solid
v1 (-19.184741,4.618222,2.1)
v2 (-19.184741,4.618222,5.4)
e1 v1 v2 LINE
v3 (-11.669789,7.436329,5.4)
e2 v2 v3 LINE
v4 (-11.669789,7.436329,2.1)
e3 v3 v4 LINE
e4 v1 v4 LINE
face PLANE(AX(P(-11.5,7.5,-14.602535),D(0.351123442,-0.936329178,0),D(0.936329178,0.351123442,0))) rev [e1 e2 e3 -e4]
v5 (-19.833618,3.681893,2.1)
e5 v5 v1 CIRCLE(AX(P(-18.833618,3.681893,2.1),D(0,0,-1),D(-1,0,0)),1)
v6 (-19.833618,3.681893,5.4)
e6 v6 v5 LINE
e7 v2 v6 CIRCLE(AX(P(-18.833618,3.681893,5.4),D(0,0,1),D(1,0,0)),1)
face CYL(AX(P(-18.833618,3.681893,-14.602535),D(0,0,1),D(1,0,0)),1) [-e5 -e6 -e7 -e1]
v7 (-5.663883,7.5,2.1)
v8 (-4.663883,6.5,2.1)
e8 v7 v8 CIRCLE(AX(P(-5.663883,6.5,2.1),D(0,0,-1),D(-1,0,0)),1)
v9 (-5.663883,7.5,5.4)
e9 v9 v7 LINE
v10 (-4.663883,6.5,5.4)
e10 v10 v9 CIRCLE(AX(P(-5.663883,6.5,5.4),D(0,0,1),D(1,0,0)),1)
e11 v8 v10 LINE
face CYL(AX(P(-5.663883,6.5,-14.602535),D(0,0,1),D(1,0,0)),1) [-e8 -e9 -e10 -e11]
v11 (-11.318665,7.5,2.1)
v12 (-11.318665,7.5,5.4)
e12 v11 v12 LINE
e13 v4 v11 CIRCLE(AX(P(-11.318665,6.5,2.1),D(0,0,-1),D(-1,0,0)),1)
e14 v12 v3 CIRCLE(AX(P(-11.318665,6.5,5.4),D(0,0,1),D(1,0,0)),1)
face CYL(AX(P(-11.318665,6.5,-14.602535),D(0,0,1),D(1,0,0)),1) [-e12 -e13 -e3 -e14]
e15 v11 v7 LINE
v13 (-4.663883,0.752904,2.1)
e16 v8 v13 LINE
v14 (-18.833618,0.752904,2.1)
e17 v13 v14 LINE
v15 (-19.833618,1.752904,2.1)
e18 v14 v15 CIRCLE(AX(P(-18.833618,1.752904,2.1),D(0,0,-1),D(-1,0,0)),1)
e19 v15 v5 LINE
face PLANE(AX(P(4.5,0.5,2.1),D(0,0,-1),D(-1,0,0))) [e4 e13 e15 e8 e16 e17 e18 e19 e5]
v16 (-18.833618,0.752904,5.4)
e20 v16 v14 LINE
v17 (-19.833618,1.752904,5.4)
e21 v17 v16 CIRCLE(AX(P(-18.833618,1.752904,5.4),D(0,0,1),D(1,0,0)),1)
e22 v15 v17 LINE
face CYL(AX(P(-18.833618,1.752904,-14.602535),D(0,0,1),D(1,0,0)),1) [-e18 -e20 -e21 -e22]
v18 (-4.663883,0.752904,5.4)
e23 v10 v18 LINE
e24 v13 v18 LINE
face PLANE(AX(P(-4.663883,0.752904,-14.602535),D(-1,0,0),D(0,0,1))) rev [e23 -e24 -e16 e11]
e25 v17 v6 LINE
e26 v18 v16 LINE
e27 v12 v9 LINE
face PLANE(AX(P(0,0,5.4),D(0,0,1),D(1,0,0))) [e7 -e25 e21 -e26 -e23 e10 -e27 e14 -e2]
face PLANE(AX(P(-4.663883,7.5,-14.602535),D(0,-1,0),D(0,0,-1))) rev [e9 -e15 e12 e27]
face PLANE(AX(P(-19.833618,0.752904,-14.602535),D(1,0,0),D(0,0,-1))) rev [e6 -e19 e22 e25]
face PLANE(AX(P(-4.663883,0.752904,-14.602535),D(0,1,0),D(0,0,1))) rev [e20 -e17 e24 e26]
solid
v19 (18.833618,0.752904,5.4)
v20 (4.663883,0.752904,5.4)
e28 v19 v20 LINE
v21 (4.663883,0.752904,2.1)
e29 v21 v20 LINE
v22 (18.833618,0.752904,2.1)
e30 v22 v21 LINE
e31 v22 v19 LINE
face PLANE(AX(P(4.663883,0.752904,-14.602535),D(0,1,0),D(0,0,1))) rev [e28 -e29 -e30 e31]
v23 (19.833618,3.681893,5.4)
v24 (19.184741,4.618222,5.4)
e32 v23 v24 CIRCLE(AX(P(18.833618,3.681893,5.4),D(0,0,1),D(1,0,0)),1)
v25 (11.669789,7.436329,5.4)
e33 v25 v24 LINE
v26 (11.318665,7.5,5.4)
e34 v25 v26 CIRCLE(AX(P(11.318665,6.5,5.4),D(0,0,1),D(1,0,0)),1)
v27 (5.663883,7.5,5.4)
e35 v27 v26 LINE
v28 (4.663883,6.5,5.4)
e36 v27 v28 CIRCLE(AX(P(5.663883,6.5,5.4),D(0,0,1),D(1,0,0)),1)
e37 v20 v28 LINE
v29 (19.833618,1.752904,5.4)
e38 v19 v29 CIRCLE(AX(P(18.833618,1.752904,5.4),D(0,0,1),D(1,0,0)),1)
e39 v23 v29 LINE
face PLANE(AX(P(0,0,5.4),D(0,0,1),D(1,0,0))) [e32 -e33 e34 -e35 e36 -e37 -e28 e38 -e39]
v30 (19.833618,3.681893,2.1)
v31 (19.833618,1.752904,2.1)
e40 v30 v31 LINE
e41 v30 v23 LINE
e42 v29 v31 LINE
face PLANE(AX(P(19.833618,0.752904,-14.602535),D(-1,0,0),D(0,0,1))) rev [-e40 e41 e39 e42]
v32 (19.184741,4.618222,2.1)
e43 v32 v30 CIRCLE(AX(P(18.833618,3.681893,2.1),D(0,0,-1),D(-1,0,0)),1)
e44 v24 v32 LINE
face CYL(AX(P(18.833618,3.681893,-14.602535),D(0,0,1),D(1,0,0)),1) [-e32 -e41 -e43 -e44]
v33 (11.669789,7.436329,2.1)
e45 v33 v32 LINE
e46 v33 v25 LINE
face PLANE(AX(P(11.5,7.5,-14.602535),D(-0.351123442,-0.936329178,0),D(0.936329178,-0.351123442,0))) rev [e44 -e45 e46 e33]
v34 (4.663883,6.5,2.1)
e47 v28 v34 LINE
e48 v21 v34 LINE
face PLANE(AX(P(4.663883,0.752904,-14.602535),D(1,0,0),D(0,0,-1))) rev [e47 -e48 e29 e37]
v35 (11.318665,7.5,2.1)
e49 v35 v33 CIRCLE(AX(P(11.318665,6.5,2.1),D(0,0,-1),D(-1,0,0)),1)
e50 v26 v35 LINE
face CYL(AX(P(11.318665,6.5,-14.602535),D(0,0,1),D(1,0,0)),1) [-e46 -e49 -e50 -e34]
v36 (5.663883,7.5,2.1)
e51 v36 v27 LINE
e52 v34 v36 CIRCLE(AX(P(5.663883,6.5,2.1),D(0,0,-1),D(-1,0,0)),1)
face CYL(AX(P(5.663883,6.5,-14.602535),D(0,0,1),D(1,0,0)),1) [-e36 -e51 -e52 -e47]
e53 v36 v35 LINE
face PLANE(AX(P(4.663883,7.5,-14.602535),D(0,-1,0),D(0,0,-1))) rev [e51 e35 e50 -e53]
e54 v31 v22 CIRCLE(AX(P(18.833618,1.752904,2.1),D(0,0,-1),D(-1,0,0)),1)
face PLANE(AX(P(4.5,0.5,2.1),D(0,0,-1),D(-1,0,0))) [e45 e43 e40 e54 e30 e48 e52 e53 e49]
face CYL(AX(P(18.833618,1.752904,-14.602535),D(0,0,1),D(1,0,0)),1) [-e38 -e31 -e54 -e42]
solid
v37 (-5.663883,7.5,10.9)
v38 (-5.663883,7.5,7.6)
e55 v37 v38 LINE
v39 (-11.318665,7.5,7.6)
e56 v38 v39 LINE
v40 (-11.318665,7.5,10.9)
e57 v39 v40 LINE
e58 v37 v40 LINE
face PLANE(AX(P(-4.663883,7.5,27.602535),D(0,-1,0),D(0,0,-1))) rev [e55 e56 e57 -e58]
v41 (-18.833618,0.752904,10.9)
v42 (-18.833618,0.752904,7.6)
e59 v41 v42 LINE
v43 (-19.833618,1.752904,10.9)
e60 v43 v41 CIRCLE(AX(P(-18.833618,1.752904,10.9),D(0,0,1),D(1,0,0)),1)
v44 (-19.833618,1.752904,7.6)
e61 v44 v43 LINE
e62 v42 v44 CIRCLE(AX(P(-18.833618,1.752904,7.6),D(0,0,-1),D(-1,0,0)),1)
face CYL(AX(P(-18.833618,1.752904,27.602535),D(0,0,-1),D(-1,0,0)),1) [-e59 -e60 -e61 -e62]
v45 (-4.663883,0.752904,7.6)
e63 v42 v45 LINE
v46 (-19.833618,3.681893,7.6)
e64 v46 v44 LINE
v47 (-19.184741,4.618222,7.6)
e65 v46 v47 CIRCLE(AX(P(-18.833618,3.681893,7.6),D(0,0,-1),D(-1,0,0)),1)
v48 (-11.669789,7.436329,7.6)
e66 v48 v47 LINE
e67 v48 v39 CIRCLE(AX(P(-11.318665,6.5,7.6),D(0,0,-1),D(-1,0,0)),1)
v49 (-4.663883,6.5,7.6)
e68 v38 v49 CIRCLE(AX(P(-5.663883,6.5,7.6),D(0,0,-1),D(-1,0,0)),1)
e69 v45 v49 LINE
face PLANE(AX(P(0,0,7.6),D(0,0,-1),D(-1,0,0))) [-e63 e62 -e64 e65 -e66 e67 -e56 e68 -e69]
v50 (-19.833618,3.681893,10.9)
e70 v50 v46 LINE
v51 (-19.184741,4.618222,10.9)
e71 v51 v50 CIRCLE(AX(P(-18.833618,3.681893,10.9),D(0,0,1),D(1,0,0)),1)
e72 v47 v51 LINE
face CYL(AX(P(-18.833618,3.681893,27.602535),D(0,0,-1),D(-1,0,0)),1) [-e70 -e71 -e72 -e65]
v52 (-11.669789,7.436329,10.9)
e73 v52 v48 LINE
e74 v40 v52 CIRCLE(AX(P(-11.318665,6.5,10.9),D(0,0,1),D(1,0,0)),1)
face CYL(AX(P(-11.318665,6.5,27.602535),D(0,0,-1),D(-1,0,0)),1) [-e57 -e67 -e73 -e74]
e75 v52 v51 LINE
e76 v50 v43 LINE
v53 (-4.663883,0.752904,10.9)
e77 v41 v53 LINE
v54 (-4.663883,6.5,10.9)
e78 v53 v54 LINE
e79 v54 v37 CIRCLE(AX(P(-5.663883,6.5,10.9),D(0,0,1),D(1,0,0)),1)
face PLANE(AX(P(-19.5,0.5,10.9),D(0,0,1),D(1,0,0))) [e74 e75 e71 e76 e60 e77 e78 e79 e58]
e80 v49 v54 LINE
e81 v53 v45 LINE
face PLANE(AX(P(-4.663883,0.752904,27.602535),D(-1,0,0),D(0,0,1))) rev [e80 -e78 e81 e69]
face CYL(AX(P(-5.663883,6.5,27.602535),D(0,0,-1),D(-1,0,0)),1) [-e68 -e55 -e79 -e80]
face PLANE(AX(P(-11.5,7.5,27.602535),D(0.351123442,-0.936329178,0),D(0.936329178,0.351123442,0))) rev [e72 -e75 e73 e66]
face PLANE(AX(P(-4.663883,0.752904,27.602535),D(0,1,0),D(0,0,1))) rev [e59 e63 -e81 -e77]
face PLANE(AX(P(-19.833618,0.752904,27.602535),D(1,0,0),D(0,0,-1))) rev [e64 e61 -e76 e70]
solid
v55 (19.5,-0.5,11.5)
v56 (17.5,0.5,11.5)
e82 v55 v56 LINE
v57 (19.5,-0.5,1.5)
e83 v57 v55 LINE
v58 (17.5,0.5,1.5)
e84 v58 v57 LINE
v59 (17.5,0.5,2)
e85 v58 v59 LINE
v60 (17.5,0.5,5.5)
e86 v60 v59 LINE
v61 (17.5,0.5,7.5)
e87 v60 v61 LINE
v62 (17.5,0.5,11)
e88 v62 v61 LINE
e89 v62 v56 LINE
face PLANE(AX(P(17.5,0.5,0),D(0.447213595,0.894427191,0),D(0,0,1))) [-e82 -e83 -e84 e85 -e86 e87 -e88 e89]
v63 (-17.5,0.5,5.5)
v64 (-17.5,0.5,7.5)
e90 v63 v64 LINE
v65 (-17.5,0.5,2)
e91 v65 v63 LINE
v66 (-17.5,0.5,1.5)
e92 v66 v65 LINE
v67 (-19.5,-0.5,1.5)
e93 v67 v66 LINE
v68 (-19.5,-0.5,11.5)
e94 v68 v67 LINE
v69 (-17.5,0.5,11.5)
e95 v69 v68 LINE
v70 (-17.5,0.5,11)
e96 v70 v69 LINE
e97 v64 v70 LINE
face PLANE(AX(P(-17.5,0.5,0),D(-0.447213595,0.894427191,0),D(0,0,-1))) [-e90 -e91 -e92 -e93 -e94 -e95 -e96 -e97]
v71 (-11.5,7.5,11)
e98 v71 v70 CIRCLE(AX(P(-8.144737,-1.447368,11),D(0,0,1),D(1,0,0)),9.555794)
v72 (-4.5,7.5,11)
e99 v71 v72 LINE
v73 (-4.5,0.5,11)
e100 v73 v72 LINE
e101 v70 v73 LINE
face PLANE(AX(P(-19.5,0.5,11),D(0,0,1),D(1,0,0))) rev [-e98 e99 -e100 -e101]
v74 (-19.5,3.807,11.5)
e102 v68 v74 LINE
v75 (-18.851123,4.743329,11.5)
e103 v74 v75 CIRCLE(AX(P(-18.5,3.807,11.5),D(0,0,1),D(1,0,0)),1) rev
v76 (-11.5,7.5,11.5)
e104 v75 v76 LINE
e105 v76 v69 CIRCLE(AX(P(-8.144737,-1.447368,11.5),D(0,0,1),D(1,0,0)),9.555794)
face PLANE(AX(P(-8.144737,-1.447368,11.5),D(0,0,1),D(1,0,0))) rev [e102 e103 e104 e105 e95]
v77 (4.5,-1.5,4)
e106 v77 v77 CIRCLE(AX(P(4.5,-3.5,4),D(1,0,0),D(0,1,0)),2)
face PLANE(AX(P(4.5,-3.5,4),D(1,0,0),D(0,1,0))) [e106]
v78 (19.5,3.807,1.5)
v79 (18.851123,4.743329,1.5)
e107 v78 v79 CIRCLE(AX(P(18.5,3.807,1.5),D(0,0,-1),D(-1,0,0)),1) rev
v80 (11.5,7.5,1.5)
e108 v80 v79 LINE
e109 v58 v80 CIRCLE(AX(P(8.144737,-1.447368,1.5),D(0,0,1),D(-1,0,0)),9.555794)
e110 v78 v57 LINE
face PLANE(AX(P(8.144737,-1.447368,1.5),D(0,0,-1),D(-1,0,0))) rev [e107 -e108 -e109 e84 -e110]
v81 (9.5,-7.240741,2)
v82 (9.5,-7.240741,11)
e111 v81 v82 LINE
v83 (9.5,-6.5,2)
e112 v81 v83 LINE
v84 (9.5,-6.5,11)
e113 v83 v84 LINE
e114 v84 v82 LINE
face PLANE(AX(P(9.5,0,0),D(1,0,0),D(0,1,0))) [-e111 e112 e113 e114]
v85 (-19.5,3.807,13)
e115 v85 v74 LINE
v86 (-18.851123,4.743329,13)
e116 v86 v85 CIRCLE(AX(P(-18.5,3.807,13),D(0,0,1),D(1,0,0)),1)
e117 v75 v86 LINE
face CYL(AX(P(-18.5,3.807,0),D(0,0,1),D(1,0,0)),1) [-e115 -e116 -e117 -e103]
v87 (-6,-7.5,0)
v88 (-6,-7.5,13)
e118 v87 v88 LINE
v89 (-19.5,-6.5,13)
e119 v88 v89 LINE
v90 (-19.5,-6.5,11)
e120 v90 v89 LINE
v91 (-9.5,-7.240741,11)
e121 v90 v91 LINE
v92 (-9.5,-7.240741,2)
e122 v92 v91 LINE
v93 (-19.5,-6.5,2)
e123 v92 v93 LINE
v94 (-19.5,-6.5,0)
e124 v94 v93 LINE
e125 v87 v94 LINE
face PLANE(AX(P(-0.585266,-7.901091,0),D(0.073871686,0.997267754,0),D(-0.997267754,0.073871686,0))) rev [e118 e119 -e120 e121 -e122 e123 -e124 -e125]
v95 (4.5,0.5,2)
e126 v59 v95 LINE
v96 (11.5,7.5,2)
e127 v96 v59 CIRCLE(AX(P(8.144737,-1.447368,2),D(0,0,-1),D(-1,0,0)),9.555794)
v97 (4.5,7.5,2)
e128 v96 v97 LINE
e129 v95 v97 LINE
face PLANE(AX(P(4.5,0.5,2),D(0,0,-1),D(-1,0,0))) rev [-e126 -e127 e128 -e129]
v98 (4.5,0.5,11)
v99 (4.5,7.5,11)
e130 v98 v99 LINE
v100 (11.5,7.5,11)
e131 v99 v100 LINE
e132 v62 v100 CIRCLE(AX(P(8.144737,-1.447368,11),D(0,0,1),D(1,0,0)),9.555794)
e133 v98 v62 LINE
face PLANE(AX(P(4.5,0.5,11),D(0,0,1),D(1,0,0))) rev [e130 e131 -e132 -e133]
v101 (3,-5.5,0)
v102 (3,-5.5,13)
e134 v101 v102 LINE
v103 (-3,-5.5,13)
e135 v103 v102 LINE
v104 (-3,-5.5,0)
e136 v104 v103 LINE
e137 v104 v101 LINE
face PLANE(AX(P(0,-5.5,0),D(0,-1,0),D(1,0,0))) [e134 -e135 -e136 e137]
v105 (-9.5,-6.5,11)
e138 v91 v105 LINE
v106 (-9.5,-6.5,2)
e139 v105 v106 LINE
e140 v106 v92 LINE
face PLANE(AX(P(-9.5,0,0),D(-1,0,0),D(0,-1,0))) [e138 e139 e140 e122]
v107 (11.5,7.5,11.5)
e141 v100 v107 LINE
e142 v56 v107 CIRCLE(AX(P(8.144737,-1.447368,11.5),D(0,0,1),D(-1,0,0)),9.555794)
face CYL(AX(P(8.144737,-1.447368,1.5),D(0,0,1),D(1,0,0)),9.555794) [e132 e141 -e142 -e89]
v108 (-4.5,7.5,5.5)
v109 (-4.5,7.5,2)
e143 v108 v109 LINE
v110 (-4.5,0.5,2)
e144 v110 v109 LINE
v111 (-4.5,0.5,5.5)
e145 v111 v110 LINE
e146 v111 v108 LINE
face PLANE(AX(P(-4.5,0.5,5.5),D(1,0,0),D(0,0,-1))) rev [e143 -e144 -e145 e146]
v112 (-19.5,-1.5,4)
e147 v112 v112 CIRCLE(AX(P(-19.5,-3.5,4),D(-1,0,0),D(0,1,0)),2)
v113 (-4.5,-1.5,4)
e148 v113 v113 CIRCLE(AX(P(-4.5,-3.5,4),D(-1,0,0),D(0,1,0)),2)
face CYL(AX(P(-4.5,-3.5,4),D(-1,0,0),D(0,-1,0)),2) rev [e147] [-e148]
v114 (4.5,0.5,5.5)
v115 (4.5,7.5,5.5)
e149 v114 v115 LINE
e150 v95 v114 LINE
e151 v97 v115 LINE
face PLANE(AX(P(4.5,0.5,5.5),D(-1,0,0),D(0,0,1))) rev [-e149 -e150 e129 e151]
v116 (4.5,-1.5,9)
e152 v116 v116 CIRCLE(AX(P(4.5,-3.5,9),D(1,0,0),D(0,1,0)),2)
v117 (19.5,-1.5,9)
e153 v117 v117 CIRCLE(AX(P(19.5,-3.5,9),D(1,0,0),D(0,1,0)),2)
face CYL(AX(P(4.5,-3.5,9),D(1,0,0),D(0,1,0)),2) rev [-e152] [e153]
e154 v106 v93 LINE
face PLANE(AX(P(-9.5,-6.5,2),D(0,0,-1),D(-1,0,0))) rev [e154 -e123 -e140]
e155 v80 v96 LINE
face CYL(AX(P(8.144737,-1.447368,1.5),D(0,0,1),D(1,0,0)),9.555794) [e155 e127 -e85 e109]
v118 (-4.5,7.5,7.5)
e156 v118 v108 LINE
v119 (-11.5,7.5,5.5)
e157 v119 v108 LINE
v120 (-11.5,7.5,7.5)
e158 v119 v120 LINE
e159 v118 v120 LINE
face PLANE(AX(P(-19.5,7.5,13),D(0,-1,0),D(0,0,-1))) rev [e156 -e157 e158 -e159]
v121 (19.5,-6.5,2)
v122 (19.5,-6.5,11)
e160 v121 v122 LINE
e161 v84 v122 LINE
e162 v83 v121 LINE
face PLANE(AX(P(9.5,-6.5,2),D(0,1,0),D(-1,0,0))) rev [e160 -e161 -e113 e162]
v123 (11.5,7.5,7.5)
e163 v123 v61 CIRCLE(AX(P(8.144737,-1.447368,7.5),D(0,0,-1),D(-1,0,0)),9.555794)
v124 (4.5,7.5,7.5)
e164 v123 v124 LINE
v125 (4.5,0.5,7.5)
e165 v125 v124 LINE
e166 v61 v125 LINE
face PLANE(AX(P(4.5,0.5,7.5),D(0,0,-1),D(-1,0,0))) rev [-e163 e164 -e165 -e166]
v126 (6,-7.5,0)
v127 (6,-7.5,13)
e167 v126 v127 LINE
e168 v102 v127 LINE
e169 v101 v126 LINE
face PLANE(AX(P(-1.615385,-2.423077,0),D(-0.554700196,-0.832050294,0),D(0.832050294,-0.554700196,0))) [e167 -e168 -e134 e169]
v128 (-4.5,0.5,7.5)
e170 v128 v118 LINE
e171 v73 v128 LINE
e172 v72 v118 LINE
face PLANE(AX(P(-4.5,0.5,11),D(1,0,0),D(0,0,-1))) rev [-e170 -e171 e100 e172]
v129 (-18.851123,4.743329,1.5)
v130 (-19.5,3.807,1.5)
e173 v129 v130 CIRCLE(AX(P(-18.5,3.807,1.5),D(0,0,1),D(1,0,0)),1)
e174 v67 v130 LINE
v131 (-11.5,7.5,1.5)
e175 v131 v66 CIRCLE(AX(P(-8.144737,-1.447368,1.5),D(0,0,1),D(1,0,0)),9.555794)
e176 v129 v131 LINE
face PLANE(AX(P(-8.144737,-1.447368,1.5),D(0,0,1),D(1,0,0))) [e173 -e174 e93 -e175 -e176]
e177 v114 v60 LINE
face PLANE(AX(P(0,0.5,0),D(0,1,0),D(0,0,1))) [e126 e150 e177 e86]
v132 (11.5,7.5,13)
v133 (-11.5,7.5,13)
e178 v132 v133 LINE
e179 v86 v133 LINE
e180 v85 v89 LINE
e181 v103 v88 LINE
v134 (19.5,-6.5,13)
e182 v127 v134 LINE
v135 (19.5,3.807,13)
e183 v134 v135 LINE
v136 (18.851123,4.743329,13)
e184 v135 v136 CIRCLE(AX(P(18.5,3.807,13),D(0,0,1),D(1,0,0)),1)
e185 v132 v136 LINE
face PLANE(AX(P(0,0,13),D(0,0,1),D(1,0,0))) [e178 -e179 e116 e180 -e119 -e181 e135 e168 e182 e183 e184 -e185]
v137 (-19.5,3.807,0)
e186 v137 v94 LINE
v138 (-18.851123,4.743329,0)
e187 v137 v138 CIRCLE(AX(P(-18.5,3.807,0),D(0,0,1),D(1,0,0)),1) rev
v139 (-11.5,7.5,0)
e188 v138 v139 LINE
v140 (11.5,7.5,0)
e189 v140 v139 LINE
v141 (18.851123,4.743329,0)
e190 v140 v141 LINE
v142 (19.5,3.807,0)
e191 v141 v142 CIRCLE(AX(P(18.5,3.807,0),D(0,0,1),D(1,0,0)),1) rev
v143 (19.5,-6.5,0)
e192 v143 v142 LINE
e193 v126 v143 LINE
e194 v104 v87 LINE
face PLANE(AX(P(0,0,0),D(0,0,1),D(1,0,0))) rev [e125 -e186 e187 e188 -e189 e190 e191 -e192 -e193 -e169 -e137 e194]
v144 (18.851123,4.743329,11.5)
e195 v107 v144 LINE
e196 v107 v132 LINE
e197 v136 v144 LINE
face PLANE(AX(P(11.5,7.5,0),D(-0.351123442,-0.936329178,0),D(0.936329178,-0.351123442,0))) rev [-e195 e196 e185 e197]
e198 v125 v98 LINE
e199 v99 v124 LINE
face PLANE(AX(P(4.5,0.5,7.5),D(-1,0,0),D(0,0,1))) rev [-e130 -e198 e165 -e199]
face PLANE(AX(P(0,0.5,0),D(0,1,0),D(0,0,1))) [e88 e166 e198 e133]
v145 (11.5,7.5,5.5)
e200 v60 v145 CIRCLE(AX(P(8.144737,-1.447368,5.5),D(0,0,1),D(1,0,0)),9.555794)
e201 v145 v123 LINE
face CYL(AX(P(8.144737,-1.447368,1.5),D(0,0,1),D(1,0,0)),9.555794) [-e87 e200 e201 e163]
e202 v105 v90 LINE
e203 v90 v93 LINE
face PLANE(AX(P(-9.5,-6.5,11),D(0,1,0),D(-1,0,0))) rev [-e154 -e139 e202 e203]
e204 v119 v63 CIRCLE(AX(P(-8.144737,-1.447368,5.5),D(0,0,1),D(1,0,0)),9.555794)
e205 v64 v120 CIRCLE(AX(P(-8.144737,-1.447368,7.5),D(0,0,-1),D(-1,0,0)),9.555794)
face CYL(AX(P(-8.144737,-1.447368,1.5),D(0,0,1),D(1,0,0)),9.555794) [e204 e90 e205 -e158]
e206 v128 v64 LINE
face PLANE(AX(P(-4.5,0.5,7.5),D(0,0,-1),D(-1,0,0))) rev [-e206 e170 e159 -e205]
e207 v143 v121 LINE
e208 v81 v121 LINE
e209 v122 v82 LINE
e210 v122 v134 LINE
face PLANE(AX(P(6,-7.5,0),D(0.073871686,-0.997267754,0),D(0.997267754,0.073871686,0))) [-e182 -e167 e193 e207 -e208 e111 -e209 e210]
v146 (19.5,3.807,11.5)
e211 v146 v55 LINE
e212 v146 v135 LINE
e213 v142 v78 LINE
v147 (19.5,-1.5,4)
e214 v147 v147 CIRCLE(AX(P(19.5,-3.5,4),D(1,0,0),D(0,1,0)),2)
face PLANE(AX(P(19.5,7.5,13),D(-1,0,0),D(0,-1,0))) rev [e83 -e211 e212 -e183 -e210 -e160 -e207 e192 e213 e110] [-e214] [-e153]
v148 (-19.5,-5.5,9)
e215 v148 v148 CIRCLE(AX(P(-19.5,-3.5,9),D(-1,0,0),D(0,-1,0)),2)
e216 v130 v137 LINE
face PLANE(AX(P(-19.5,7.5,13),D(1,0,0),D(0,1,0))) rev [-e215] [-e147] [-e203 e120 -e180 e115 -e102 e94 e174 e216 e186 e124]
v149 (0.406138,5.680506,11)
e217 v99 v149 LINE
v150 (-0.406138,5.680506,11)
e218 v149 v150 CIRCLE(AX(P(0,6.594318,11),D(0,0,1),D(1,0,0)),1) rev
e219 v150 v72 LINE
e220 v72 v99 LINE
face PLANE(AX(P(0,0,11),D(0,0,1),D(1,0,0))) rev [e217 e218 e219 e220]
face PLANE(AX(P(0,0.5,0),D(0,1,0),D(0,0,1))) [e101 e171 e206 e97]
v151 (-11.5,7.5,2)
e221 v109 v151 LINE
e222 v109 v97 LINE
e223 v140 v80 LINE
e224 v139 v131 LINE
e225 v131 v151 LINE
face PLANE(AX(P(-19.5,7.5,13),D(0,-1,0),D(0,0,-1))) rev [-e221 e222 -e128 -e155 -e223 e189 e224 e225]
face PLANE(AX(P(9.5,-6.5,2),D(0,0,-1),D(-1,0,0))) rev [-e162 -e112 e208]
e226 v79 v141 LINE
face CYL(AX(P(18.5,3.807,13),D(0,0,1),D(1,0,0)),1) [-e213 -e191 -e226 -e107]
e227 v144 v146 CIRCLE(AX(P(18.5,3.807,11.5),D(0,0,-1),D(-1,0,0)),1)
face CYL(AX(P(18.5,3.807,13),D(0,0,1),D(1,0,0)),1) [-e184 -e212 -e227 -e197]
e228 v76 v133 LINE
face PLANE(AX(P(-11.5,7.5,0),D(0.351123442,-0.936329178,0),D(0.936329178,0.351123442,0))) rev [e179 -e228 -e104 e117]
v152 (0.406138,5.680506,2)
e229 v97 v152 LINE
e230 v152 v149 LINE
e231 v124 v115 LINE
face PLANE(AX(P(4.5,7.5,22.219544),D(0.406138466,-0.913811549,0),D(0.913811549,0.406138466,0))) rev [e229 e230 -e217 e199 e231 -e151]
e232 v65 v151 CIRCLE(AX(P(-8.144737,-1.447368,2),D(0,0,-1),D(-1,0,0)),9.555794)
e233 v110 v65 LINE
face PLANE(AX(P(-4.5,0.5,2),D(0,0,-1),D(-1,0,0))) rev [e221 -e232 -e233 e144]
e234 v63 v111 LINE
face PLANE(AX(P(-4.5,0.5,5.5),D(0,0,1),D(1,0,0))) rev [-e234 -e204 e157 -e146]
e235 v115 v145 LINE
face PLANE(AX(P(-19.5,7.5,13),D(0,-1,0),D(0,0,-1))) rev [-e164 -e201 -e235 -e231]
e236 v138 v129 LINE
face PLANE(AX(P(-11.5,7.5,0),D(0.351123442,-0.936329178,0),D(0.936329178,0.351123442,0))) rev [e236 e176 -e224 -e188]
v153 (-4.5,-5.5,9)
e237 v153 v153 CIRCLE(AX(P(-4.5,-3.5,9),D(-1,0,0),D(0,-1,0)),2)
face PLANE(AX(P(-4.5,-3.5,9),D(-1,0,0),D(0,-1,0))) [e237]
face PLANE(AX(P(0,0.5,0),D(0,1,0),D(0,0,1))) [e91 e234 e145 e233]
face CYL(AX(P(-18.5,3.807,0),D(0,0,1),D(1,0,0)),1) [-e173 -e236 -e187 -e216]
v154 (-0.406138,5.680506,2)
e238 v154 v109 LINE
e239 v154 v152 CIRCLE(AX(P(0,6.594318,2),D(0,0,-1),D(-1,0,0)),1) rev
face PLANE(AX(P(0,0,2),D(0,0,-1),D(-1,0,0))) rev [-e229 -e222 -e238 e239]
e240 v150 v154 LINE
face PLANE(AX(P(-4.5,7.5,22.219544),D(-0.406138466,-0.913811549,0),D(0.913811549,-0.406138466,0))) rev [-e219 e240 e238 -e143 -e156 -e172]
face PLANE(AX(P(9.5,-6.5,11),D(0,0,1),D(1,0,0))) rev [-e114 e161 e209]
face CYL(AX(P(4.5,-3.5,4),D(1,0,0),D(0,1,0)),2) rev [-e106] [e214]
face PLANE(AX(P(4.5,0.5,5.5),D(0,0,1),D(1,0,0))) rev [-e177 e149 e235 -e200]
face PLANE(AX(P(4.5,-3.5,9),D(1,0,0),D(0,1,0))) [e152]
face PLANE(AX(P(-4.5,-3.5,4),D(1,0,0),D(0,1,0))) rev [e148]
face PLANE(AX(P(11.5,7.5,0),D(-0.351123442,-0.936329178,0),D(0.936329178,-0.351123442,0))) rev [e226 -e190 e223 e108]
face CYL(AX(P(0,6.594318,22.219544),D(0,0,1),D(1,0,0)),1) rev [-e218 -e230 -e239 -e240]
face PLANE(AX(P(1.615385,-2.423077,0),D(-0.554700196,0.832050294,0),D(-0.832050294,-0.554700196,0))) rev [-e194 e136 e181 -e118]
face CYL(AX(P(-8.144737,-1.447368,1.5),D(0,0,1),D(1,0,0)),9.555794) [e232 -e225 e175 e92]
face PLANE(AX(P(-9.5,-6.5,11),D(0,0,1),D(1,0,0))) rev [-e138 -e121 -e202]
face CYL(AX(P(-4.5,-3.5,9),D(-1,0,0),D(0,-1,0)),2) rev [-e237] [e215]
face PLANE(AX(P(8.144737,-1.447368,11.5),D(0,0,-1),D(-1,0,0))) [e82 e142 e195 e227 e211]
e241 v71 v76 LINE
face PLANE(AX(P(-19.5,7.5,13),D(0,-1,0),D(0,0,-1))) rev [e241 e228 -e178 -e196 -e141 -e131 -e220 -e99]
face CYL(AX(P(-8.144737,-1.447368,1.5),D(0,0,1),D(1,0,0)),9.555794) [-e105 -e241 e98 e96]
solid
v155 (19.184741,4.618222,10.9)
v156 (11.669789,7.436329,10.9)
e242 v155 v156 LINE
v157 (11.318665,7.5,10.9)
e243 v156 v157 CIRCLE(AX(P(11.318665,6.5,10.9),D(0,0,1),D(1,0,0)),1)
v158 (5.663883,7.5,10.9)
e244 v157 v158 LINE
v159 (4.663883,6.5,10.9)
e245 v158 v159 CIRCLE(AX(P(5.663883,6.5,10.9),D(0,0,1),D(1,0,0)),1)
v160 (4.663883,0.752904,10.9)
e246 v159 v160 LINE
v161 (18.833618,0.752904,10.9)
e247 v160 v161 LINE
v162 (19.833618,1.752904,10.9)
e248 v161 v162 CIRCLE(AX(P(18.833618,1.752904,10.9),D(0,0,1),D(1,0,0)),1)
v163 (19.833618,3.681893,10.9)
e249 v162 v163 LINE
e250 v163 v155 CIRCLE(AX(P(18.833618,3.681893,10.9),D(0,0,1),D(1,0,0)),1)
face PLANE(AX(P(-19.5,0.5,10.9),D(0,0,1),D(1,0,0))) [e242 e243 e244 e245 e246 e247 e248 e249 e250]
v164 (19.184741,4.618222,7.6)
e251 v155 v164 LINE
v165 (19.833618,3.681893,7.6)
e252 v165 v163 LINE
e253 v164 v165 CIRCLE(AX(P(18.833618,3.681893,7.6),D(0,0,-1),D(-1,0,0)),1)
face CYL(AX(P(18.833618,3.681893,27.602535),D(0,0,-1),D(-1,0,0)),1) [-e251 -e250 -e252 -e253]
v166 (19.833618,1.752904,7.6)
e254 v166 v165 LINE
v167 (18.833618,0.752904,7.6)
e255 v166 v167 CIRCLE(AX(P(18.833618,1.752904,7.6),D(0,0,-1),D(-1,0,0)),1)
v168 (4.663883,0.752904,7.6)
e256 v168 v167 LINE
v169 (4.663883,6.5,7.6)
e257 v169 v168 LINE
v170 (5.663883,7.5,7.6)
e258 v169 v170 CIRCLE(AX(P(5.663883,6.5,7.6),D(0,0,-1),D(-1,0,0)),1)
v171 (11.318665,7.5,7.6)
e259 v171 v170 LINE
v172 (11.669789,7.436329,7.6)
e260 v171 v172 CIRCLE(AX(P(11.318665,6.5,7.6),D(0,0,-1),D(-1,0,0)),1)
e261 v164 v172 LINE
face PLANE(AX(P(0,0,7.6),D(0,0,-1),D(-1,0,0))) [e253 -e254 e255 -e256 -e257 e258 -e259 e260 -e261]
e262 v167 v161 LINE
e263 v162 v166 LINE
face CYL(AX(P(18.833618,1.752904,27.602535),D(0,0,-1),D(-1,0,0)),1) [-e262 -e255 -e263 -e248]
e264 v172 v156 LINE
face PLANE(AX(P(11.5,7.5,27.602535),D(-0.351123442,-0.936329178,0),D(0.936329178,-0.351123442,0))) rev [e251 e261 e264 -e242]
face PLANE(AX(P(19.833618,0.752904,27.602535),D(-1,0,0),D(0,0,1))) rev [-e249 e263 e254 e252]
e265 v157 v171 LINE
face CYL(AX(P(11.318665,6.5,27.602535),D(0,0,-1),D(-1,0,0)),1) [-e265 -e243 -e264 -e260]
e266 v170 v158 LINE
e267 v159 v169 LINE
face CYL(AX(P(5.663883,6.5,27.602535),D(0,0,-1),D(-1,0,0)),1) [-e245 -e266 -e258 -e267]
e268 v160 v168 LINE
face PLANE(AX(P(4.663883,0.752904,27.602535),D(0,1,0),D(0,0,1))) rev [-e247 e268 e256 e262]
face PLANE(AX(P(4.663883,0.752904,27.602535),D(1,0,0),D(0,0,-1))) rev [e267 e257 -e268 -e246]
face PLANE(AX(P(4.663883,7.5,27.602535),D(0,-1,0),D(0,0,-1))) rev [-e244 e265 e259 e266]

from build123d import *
from OCP.BRepFilletAPI import BRepFilletAPI_MakeChamfer

# Parameters (mm, degrees)
CROQUIS1_W                  = 39
CROQUIS1_H                  = 15
SALIENTE_EXTRUIR1_DEPTH     = 13
CORTAR_EXTRUIR1_DEPTH       = 13
CORTAR_EXTRUIR2_DEPTH       = 25.606909599
CROQUIS4_W                  = 9
CROQUIS4_H                  = 1
CORTAR_EXTRUIR3_DEPTH       = 10
CROQUIS5_W                  = 9
CROQUIS5_H                  = 1
CORTAR_EXTRUIR4_DEPTH       = 10
CORTAR_EXTRUIR5_START       = -2
CORTAR_EXTRUIR5_DEPTH       = 9
CROQUIS7_R                  = 2
CORTAR_EXTRUIR10_DEPTH      = 15
CORTAR_EXTRUIR11_START      = -15
CROQUIS8_R                  = 2
CORTAR_EXTRUIR11_DEPTH      = 15
CROQUIS9_W                  = 15
CROQUIS9_H                  = 3.5
CORTAR_EXTRUIR12_DEPTH      = 7
CORTAR_EXTRUIR13_DEPTH      = 4
CORTAR_EXTRUIR13_DEPTH_BACK = 6
CHAFL_N1_SIZE               = 2
CHAFL_N1_SIZE_2             = 1
SALIENTE_EXTRUIR2_START     = 0.1
SALIENTE_EXTRUIR2_DEPTH     = 3.3
SALIENTE_EXTRUIR2_2_DEPTH   = 3.3
SALIENTE_EXTRUIR3_START     = 2.2
SALIENTE_EXTRUIR3_DEPTH     = 3.3
SALIENTE_EXTRUIR3_2_DEPTH   = 3.3
REDONDEO1_R                 = 1
REDONDEO2_R                 = 1
REDONDEO3_R                 = 1
REDONDEO4_R                 = 1
REDONDEO5_R                 = 1
REDONDEO6_R                 = 1
REDONDEO7_R                 = 1
REDONDEO8_R                 = 1
REDONDEO12_R                = 1
REDONDEO13_R                = 1
REDONDEO14_R                = 1
REDONDEO15_R                = 1
REDONDEO16_R                = 1
REDONDEO17_R                = 1


with BuildPart() as part:
    # Croquis1 → Saliente-Extruir1 (new body)
    with BuildSketch(Plane.XY):
        Rectangle(CROQUIS1_W, CROQUIS1_H)
    extrude(amount=SALIENTE_EXTRUIR1_DEPTH)

    # Croquis2 → Cortar-Extruir1 (cut)
    with BuildSketch(Plane.XY.offset(13)):
        Polygon((0, -5.5), (0, -7.5), (6, -7.5), (3, -5.5), align=None)
        Polygon((-6, -7.5), (0, -7.5), (0, -5.5), (-3, -5.5), align=None)
        Polygon((-19.5, -7.5), (-6, -7.5), (-19.5, -6.5), align=None)
        Polygon((6, -7.5), (19.5, -6.5), (19.5, -7.5), align=None)
    extrude(amount=-CORTAR_EXTRUIR1_DEPTH, mode=Mode.SUBTRACT)

    # Croquis3 → Cortar-Extruir2 (cut, through all)
    with BuildSketch(Plane.XY.offset(13)):
        Polygon((-11.5, 7.5), (-19.5, 4.5), (-19.5, 7.5), align=None)
        Polygon((19.5, 4.5), (19.5, 7.5), (11.5, 7.5), align=None)
    extrude(amount=-CORTAR_EXTRUIR2_DEPTH, mode=Mode.SUBTRACT)

    # Croquis4 → Cortar-Extruir3 (cut)
    with BuildSketch(Plane(origin=(19.5, 0, 0), x_dir=(0, 0, -1), z_dir=(1, 0, 0))):
        with Locations((-6.5, -7)):
            Rectangle(CROQUIS4_W, CROQUIS4_H)
    extrude(amount=-CORTAR_EXTRUIR3_DEPTH, mode=Mode.SUBTRACT)

    # Croquis5 → Cortar-Extruir4 (cut)
    with BuildSketch(Plane.ZY.offset(19.5)):
        with Locations((6.5, -7)):
            Rectangle(CROQUIS5_W, CROQUIS5_H)
    extrude(amount=-CORTAR_EXTRUIR4_DEPTH, mode=Mode.SUBTRACT)

    # Croquis6 → Cortar-Extruir5 (cut)
    with BuildSketch(Plane(origin=(0, 0, 0), x_dir=(-1, 0, 0), z_dir=(0, 0, -1)).offset(CORTAR_EXTRUIR5_START)):
        Polygon((4.5, 7.5), (-4.5, 7.5), (0, 5.5), align=None)
    extrude(amount=-CORTAR_EXTRUIR5_DEPTH, mode=Mode.SUBTRACT)

    # Croquis7 → Cortar-Extruir10 (cut)
    with BuildSketch(Plane.ZY.offset(19.5)):
        with Locations(Location((9, -3.5, 0), (0, 0, 270))):
            Circle(CROQUIS7_R)
        with Locations(Location((4, -3.5, 0), (0, 0, 90))):
            Circle(CROQUIS7_R)
    extrude(amount=-CORTAR_EXTRUIR10_DEPTH, mode=Mode.SUBTRACT)

    # Croquis8 → Cortar-Extruir11 (cut)
    with BuildSketch(Plane(origin=(19.5, 0, 0), x_dir=(0, 0, -1), z_dir=(1, 0, 0)).offset(CORTAR_EXTRUIR11_START)):
        with Locations(Location((-9, -3.5, 0), (0, 0, 270))):
            Circle(CROQUIS8_R)
        with Locations(Location((-4, -3.5, 0), (0, 0, 90))):
            Circle(CROQUIS8_R)
    extrude(amount=CORTAR_EXTRUIR11_DEPTH, mode=Mode.SUBTRACT)

    # Croquis9 → Cortar-Extruir12 (cut)
    with BuildSketch(Plane(origin=(0, 7.5, 0), x_dir=(1, 0, 0), z_dir=(0, 1, 0))):
        with Locations((12, -3.75)):
            Rectangle(CROQUIS9_W, CROQUIS9_H)
        with Locations((-12, -3.75)):
            Rectangle(CROQUIS9_W, CROQUIS9_H)
        with Locations((-12, -9.25)):
            Rectangle(CROQUIS9_W, CROQUIS9_H)
        with Locations((12, -9.25)):
            Rectangle(CROQUIS9_W, CROQUIS9_H)
    extrude(amount=-CORTAR_EXTRUIR12_DEPTH, mode=Mode.SUBTRACT)

    # Croquis10 → Cortar-Extruir13 (cut, two sides: drawn at the far end of the back side and taken through both)
    with BuildSketch(Plane(origin=(0, 0, 5.5), x_dir=(-1, 0, 0), z_dir=(0, 0, -1)).offset(-CORTAR_EXTRUIR13_DEPTH_BACK)):
        with BuildLine():
            Line((17.5, 0.5), (19.5, 0.5))
            Line((19.5, 0.5), (19.5, 4.5))
            Line((19.5, 4.5), (11.5, 7.5))
            ThreePointArc((11.5, 7.5), (15.400036271, 4.771459661), (17.5, 0.5))
        make_face()
        with BuildLine():
            Line((-19.5, 4.5), (-11.5, 7.5))
            ThreePointArc((-11.5, 7.5), (-15.400036271, 4.771459661), (-17.5, 0.5))
            Line((-17.5, 0.5), (-19.5, 0.5))
            Line((-19.5, 0.5), (-19.5, 4.5))
        make_face()
    extrude(amount=CORTAR_EXTRUIR13_DEPTH + CORTAR_EXTRUIR13_DEPTH_BACK, mode=Mode.SUBTRACT)

    # Chaflán1
    chafl_n1_edges_1 = [part.edges().sort_by_distance(p)[0] for p in [
        (-19.5, 0.5, 6.5),
    ]]
    chafl_n1_side_1 = [part.faces().sort_by_distance(p)[0] for p in [
        (-19.48, 0.5, 6.5),
    ]]
    chafl_n1_edges_2 = [part.edges().sort_by_distance(p)[0] for p in [
        (19.5, 0.5, 6.5),
    ]]
    chafl_n1_side_2 = [part.faces().sort_by_distance(p)[0] for p in [
        (19.48, 0.5, 6.5),
    ]]
    chafl_n1 = BRepFilletAPI_MakeChamfer(part.part.solid().wrapped)
    for e in chafl_n1_edges_1:
        chafl_n1.Add(CHAFL_N1_SIZE - 0.0001, CHAFL_N1_SIZE_2 - 0.0001, e.wrapped, chafl_n1_side_1[0].wrapped)
    for e in chafl_n1_edges_2:
        chafl_n1.Add(CHAFL_N1_SIZE - 0.0001, CHAFL_N1_SIZE_2 - 0.0001, e.wrapped, chafl_n1_side_2[0].wrapped)
    add(Compound.cast(chafl_n1.Shape()), mode=Mode.REPLACE)  # a hair under: the kernel refuses the full size

    # Redondeo12
    redondeo12_edges = [part.edges().sort_by_distance(p)[0] for p in [
        (0, 5.5, 6.5),
    ]]
    fillet(redondeo12_edges, radius=REDONDEO12_R)

    # Redondeo13
    redondeo13_edges = [part.edges().sort_by_distance(p)[0] for p in [
        (19.5, 4.5, 12.25),
        (-19.5, 4.5, 12.25),
        (-19.5, 4.5, 0.75),
        (19.5, 4.5, 0.75),
    ]]
    fillet(redondeo13_edges, radius=REDONDEO13_R)


with BuildPart() as body_2:
    # Croquis11 → Saliente-Extruir2 (new body)
    with BuildSketch(Plane.XY.offset(7.5).offset(SALIENTE_EXTRUIR2_START)):
        Polygon((11.5, 7.5), (19.833617862, 4.374893302), (19.833617862, 0.752903639), (4.663883378, 0.752903639), (4.663883378, 7.5), align=None)
    extrude(amount=SALIENTE_EXTRUIR2_DEPTH)

    # Redondeo2
    redondeo2_edges = [body_2.edges().sort_by_distance(p)[0] for p in [
        (4.663883378, 7.5, 9.25),
    ]]
    fillet(redondeo2_edges, radius=REDONDEO2_R)

    # Redondeo7
    redondeo7_edges = [body_2.edges().sort_by_distance(p)[0] for p in [
        (11.5, 7.5, 9.25),
    ]]
    fillet(redondeo7_edges, radius=REDONDEO7_R)

    # Redondeo17
    redondeo17_edges = [body_2.edges().sort_by_distance(p)[0] for p in [
        (19.833617862, 0.752903639, 9.25),
        (19.833617862, 4.374893302, 9.25),
    ]]
    fillet(redondeo17_edges, radius=REDONDEO17_R)


with BuildPart() as body_3:
    # Croquis11 → Saliente-Extruir2 2 (new body)
    with BuildSketch(Plane.XY.offset(7.5).offset(SALIENTE_EXTRUIR2_START)):
        Polygon((-19.833617862, 0.752903639), (-19.833617862, 4.374893302), (-11.5, 7.5), (-4.663883378, 7.5), (-4.663883378, 0.752903639), align=None)
    extrude(amount=SALIENTE_EXTRUIR2_2_DEPTH)

    # Redondeo4
    redondeo4_edges = [body_3.edges().sort_by_distance(p)[0] for p in [
        (-4.663883378, 7.5, 9.25),
    ]]
    fillet(redondeo4_edges, radius=REDONDEO4_R)

    # Redondeo5
    redondeo5_edges = [body_3.edges().sort_by_distance(p)[0] for p in [
        (-11.5, 7.5, 9.25),
    ]]
    fillet(redondeo5_edges, radius=REDONDEO5_R)

    # Redondeo15
    redondeo15_edges = [body_3.edges().sort_by_distance(p)[0] for p in [
        (-19.833617862, 4.374893302, 9.25),
        (-19.833617862, 0.752903639, 9.25),
    ]]
    fillet(redondeo15_edges, radius=REDONDEO15_R)


with BuildPart() as body_4:
    # Croquis12 → Saliente-Extruir3 (new body)
    with BuildSketch(Plane(origin=(0, 0, 7.6), x_dir=(-1, 0, 0), z_dir=(0, 0, -1)).offset(SALIENTE_EXTRUIR3_START)):
        Polygon((11.5, 7.5), (19.833617862, 4.374893302), (19.833617862, 0.752903639), (4.663883378, 0.752903639), (4.663883378, 7.5), align=None)
    extrude(amount=SALIENTE_EXTRUIR3_DEPTH)

    # Redondeo3
    redondeo3_edges = [body_4.edges().sort_by_distance(p)[0] for p in [
        (-4.663883378, 7.5, 3.75),
    ]]
    fillet(redondeo3_edges, radius=REDONDEO3_R)

    # Redondeo6
    redondeo6_edges = [body_4.edges().sort_by_distance(p)[0] for p in [
        (-11.5, 7.5, 3.75),
    ]]
    fillet(redondeo6_edges, radius=REDONDEO6_R)

    # Redondeo14
    redondeo14_edges = [body_4.edges().sort_by_distance(p)[0] for p in [
        (-19.833617862, 0.752903639, 3.75),
        (-19.833617862, 4.374893302, 3.75),
    ]]
    fillet(redondeo14_edges, radius=REDONDEO14_R)


with BuildPart() as body_5:
    # Croquis12 → Saliente-Extruir3 2 (new body)
    with BuildSketch(Plane(origin=(0, 0, 7.6), x_dir=(-1, 0, 0), z_dir=(0, 0, -1)).offset(SALIENTE_EXTRUIR3_START)):
        Polygon((-19.833617862, 0.752903639), (-19.833617862, 4.374893302), (-11.5, 7.5), (-4.663883378, 7.5), (-4.663883378, 0.752903639), align=None)
    extrude(amount=SALIENTE_EXTRUIR3_2_DEPTH)

    # Redondeo1
    redondeo1_edges = [body_5.edges().sort_by_distance(p)[0] for p in [
        (4.663883378, 7.5, 3.75),
    ]]
    fillet(redondeo1_edges, radius=REDONDEO1_R)

    # Redondeo8
    redondeo8_edges = [body_5.edges().sort_by_distance(p)[0] for p in [
        (11.5, 7.5, 3.75),
    ]]
    fillet(redondeo8_edges, radius=REDONDEO8_R)

    # Redondeo16
    redondeo16_edges = [body_5.edges().sort_by_distance(p)[0] for p in [
        (19.833617862, 4.374893302, 3.75),
        (19.833617862, 0.752903639, 3.75),
    ]]
    fillet(redondeo16_edges, radius=REDONDEO16_R)


solid = Compound([part.part, body_2.part, body_3.part, body_4.part, body_5.part])
